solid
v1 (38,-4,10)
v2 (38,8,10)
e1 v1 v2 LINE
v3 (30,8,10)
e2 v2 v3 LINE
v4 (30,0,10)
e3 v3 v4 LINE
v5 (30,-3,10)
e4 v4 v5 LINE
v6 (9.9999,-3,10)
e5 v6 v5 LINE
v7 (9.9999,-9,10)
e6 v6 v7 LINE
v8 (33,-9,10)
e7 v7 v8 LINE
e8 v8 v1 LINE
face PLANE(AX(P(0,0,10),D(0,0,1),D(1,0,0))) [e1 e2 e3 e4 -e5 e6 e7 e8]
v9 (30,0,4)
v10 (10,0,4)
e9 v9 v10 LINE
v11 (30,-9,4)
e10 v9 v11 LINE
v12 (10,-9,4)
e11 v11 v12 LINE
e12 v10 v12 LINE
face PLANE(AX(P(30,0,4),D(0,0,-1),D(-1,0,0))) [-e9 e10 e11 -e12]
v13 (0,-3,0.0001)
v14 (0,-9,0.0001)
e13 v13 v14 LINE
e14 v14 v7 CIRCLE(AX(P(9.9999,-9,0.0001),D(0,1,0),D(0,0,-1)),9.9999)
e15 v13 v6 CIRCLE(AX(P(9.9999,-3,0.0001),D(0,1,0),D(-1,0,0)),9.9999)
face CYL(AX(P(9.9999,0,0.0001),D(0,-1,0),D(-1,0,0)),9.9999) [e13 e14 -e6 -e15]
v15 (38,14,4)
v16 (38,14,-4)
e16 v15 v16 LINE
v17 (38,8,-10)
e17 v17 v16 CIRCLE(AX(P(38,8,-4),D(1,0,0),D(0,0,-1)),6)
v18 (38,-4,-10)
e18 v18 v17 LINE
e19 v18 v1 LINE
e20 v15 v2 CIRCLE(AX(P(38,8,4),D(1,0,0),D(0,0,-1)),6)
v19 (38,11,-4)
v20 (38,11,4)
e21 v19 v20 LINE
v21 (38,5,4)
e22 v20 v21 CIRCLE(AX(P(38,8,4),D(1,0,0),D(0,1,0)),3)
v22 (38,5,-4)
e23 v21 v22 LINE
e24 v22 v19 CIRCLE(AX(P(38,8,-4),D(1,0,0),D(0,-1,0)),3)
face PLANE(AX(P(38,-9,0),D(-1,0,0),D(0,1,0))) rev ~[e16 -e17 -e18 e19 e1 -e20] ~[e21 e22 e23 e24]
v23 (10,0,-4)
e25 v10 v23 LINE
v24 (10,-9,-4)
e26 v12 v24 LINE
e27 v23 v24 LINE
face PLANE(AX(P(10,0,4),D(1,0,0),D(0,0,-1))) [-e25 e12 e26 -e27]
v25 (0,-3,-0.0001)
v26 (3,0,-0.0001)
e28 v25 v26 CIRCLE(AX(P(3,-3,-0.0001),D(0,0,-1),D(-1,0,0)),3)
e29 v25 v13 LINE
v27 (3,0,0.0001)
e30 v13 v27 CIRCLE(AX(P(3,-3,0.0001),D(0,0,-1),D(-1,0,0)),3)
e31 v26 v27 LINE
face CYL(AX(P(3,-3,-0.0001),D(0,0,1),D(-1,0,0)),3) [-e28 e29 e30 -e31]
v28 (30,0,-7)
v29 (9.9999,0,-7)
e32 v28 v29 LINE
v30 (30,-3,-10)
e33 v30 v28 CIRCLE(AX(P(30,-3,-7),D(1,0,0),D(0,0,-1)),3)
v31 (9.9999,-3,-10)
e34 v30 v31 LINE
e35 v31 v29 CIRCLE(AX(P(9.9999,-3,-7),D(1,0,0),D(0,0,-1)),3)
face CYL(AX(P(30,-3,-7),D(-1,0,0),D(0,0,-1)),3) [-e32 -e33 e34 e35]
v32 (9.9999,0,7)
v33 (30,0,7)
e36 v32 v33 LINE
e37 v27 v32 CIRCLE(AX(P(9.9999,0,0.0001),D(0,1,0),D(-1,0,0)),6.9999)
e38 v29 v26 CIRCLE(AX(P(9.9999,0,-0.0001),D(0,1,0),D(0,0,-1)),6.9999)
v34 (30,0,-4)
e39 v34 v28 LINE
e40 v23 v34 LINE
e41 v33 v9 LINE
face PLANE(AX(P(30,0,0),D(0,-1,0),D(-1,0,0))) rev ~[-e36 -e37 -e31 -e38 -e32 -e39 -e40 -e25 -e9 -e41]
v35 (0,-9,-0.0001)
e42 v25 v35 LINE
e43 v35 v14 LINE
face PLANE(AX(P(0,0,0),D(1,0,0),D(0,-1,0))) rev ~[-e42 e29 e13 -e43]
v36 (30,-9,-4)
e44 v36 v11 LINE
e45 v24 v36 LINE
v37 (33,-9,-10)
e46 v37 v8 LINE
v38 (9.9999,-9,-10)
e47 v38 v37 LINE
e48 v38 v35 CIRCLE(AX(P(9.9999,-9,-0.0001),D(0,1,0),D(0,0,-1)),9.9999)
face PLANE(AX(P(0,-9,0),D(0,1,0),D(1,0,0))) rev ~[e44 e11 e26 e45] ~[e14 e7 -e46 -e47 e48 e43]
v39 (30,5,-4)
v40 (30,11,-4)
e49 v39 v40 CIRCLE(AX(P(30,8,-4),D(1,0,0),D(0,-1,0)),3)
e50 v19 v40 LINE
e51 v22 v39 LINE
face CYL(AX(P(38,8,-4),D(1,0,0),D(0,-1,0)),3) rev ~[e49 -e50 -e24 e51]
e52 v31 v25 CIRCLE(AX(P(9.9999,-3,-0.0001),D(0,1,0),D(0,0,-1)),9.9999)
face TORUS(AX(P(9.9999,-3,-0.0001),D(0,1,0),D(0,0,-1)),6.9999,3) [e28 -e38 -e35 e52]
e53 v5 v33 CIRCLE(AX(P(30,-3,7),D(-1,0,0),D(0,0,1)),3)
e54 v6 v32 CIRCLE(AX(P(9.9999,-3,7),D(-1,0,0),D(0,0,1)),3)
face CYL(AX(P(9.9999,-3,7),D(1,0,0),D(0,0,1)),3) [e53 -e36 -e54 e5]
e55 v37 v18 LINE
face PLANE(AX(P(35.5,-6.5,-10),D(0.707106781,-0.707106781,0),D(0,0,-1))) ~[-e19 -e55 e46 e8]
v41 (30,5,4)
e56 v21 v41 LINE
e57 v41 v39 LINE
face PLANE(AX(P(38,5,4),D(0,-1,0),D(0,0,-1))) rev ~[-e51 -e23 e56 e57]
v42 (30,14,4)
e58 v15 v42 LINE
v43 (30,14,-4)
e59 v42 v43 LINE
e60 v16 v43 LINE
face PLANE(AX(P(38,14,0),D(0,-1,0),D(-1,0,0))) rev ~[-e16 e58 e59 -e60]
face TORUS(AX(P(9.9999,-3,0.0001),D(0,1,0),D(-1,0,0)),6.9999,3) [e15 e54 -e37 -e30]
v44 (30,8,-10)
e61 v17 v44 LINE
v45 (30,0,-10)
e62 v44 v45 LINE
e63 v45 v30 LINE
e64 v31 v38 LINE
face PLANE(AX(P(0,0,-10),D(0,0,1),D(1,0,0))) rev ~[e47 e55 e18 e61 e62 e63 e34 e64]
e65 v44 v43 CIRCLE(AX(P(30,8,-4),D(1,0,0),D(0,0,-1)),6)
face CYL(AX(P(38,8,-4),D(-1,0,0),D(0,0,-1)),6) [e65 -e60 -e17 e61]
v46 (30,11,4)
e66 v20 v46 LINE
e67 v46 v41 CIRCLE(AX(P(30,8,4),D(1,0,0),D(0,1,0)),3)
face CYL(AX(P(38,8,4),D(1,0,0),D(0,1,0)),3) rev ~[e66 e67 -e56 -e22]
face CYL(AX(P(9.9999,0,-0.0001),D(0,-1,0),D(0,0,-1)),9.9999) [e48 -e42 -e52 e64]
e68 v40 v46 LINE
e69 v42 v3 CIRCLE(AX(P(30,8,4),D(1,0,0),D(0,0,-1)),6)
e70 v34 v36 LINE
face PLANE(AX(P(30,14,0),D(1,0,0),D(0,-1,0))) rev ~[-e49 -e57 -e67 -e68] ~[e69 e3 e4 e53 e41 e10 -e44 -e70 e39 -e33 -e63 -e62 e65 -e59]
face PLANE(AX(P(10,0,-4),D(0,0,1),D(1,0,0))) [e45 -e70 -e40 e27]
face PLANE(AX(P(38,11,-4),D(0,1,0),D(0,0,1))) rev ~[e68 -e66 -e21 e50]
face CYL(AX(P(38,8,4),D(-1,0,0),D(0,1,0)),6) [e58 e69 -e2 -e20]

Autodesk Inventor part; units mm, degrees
ref_plane "YZ Plane" through (0, 0, 0) normal (1, 0, 0) x (0, 1, 0)
ref_plane "XZ Plane" through (0, 0, 0) normal (0, 1, 0) x (-1, 0, 0)
ref_plane "XY Plane" through (0, 0, 0) normal (0, 0, 1) x (1, 0, 0)
sketch "스케치1" plane through (0, 0, 0) normal (0, 0, 1) x (1, 0, 0)
  line L0 (0, 0) -> (0, -9)
  line L1 (0, -9) -> (38, -9)
  line L2 (38, -9) -> (38, 14)
  line L3 (38, 14) -> (30, 14)
  line L4 (30, 14) -> (30, 0)
  line L5 (30, 0) -> (0, 0)
  dimension "d0" = 8
  dimension "d1" = 23
  dimension "d2" = 38
  dimension "d3" = 9
extrude "돌출1" add sketch "스케치1" along normal mid plane 20
sketch "스케치2" plane through (38, -9, 10) normal (1, 0, 0) x (0, 0, -1)
  line L0 (6, 17) -> (14, 17) construction
  line L1 (6, 14) -> (14, 14)
  line L2 (14, 20) -> (6, 20)
  arc A0 (6, 20) -> (6, 14) centre (6, 17) ccw
  arc A1 (14, 14) -> (14, 20) centre (14, 17) ccw
  line L3 (20, 0) -> (0, 0) projected
  line L4 (0, 0) -> (0, 23) projected
  point P0 (10, 9)
  point P1 (10, 17)
  dimension "d7" = 8
  dimension "d8" = 6
  dimension "d9" = 3
  dimension "d10" = 17
  dimension "d11" = 10
extrude "돌출2" cut sketch "스케치2" against normal blind 20
sketch "스케치3" plane through (0, 0, 10) normal (0, 1, 0) x (1, 0, 0)
  line L0 (10, 14) -> (30, 14)
  line L1 (30, 14) -> (30, 6)
  line L2 (30, 6) -> (10, 6)
  line L3 (10, 6) -> (10, 14)
  line L4 (0, 20) -> (0, 0) projected
  line L5 (30, 0) -> (0, 0) projected
  point P0 (0, 10)
  dimension "d14" = 8
  dimension "d15" = 20
  dimension "d16" = 10
  dimension "d17" = 6
extrude "돌출3" cut sketch "스케치3" against normal blind 20
chamfer "모따기1" distance 5 angle 45 1 edges at (38, -9, 0)
fillet "모깎기1" radius 10 2 edges at (0, -4.5, -10) (0, -4.5, 10)
fillet "모깎기2" radius 3 3 edges at (2.9289, 0, -7.0711) (20, 0, -10) (20, 0, 10)
fillet "모깎기3" radius 6 2 edges at (34, 14, 10) (34, 14, -10)
properties part number "1번부품"
